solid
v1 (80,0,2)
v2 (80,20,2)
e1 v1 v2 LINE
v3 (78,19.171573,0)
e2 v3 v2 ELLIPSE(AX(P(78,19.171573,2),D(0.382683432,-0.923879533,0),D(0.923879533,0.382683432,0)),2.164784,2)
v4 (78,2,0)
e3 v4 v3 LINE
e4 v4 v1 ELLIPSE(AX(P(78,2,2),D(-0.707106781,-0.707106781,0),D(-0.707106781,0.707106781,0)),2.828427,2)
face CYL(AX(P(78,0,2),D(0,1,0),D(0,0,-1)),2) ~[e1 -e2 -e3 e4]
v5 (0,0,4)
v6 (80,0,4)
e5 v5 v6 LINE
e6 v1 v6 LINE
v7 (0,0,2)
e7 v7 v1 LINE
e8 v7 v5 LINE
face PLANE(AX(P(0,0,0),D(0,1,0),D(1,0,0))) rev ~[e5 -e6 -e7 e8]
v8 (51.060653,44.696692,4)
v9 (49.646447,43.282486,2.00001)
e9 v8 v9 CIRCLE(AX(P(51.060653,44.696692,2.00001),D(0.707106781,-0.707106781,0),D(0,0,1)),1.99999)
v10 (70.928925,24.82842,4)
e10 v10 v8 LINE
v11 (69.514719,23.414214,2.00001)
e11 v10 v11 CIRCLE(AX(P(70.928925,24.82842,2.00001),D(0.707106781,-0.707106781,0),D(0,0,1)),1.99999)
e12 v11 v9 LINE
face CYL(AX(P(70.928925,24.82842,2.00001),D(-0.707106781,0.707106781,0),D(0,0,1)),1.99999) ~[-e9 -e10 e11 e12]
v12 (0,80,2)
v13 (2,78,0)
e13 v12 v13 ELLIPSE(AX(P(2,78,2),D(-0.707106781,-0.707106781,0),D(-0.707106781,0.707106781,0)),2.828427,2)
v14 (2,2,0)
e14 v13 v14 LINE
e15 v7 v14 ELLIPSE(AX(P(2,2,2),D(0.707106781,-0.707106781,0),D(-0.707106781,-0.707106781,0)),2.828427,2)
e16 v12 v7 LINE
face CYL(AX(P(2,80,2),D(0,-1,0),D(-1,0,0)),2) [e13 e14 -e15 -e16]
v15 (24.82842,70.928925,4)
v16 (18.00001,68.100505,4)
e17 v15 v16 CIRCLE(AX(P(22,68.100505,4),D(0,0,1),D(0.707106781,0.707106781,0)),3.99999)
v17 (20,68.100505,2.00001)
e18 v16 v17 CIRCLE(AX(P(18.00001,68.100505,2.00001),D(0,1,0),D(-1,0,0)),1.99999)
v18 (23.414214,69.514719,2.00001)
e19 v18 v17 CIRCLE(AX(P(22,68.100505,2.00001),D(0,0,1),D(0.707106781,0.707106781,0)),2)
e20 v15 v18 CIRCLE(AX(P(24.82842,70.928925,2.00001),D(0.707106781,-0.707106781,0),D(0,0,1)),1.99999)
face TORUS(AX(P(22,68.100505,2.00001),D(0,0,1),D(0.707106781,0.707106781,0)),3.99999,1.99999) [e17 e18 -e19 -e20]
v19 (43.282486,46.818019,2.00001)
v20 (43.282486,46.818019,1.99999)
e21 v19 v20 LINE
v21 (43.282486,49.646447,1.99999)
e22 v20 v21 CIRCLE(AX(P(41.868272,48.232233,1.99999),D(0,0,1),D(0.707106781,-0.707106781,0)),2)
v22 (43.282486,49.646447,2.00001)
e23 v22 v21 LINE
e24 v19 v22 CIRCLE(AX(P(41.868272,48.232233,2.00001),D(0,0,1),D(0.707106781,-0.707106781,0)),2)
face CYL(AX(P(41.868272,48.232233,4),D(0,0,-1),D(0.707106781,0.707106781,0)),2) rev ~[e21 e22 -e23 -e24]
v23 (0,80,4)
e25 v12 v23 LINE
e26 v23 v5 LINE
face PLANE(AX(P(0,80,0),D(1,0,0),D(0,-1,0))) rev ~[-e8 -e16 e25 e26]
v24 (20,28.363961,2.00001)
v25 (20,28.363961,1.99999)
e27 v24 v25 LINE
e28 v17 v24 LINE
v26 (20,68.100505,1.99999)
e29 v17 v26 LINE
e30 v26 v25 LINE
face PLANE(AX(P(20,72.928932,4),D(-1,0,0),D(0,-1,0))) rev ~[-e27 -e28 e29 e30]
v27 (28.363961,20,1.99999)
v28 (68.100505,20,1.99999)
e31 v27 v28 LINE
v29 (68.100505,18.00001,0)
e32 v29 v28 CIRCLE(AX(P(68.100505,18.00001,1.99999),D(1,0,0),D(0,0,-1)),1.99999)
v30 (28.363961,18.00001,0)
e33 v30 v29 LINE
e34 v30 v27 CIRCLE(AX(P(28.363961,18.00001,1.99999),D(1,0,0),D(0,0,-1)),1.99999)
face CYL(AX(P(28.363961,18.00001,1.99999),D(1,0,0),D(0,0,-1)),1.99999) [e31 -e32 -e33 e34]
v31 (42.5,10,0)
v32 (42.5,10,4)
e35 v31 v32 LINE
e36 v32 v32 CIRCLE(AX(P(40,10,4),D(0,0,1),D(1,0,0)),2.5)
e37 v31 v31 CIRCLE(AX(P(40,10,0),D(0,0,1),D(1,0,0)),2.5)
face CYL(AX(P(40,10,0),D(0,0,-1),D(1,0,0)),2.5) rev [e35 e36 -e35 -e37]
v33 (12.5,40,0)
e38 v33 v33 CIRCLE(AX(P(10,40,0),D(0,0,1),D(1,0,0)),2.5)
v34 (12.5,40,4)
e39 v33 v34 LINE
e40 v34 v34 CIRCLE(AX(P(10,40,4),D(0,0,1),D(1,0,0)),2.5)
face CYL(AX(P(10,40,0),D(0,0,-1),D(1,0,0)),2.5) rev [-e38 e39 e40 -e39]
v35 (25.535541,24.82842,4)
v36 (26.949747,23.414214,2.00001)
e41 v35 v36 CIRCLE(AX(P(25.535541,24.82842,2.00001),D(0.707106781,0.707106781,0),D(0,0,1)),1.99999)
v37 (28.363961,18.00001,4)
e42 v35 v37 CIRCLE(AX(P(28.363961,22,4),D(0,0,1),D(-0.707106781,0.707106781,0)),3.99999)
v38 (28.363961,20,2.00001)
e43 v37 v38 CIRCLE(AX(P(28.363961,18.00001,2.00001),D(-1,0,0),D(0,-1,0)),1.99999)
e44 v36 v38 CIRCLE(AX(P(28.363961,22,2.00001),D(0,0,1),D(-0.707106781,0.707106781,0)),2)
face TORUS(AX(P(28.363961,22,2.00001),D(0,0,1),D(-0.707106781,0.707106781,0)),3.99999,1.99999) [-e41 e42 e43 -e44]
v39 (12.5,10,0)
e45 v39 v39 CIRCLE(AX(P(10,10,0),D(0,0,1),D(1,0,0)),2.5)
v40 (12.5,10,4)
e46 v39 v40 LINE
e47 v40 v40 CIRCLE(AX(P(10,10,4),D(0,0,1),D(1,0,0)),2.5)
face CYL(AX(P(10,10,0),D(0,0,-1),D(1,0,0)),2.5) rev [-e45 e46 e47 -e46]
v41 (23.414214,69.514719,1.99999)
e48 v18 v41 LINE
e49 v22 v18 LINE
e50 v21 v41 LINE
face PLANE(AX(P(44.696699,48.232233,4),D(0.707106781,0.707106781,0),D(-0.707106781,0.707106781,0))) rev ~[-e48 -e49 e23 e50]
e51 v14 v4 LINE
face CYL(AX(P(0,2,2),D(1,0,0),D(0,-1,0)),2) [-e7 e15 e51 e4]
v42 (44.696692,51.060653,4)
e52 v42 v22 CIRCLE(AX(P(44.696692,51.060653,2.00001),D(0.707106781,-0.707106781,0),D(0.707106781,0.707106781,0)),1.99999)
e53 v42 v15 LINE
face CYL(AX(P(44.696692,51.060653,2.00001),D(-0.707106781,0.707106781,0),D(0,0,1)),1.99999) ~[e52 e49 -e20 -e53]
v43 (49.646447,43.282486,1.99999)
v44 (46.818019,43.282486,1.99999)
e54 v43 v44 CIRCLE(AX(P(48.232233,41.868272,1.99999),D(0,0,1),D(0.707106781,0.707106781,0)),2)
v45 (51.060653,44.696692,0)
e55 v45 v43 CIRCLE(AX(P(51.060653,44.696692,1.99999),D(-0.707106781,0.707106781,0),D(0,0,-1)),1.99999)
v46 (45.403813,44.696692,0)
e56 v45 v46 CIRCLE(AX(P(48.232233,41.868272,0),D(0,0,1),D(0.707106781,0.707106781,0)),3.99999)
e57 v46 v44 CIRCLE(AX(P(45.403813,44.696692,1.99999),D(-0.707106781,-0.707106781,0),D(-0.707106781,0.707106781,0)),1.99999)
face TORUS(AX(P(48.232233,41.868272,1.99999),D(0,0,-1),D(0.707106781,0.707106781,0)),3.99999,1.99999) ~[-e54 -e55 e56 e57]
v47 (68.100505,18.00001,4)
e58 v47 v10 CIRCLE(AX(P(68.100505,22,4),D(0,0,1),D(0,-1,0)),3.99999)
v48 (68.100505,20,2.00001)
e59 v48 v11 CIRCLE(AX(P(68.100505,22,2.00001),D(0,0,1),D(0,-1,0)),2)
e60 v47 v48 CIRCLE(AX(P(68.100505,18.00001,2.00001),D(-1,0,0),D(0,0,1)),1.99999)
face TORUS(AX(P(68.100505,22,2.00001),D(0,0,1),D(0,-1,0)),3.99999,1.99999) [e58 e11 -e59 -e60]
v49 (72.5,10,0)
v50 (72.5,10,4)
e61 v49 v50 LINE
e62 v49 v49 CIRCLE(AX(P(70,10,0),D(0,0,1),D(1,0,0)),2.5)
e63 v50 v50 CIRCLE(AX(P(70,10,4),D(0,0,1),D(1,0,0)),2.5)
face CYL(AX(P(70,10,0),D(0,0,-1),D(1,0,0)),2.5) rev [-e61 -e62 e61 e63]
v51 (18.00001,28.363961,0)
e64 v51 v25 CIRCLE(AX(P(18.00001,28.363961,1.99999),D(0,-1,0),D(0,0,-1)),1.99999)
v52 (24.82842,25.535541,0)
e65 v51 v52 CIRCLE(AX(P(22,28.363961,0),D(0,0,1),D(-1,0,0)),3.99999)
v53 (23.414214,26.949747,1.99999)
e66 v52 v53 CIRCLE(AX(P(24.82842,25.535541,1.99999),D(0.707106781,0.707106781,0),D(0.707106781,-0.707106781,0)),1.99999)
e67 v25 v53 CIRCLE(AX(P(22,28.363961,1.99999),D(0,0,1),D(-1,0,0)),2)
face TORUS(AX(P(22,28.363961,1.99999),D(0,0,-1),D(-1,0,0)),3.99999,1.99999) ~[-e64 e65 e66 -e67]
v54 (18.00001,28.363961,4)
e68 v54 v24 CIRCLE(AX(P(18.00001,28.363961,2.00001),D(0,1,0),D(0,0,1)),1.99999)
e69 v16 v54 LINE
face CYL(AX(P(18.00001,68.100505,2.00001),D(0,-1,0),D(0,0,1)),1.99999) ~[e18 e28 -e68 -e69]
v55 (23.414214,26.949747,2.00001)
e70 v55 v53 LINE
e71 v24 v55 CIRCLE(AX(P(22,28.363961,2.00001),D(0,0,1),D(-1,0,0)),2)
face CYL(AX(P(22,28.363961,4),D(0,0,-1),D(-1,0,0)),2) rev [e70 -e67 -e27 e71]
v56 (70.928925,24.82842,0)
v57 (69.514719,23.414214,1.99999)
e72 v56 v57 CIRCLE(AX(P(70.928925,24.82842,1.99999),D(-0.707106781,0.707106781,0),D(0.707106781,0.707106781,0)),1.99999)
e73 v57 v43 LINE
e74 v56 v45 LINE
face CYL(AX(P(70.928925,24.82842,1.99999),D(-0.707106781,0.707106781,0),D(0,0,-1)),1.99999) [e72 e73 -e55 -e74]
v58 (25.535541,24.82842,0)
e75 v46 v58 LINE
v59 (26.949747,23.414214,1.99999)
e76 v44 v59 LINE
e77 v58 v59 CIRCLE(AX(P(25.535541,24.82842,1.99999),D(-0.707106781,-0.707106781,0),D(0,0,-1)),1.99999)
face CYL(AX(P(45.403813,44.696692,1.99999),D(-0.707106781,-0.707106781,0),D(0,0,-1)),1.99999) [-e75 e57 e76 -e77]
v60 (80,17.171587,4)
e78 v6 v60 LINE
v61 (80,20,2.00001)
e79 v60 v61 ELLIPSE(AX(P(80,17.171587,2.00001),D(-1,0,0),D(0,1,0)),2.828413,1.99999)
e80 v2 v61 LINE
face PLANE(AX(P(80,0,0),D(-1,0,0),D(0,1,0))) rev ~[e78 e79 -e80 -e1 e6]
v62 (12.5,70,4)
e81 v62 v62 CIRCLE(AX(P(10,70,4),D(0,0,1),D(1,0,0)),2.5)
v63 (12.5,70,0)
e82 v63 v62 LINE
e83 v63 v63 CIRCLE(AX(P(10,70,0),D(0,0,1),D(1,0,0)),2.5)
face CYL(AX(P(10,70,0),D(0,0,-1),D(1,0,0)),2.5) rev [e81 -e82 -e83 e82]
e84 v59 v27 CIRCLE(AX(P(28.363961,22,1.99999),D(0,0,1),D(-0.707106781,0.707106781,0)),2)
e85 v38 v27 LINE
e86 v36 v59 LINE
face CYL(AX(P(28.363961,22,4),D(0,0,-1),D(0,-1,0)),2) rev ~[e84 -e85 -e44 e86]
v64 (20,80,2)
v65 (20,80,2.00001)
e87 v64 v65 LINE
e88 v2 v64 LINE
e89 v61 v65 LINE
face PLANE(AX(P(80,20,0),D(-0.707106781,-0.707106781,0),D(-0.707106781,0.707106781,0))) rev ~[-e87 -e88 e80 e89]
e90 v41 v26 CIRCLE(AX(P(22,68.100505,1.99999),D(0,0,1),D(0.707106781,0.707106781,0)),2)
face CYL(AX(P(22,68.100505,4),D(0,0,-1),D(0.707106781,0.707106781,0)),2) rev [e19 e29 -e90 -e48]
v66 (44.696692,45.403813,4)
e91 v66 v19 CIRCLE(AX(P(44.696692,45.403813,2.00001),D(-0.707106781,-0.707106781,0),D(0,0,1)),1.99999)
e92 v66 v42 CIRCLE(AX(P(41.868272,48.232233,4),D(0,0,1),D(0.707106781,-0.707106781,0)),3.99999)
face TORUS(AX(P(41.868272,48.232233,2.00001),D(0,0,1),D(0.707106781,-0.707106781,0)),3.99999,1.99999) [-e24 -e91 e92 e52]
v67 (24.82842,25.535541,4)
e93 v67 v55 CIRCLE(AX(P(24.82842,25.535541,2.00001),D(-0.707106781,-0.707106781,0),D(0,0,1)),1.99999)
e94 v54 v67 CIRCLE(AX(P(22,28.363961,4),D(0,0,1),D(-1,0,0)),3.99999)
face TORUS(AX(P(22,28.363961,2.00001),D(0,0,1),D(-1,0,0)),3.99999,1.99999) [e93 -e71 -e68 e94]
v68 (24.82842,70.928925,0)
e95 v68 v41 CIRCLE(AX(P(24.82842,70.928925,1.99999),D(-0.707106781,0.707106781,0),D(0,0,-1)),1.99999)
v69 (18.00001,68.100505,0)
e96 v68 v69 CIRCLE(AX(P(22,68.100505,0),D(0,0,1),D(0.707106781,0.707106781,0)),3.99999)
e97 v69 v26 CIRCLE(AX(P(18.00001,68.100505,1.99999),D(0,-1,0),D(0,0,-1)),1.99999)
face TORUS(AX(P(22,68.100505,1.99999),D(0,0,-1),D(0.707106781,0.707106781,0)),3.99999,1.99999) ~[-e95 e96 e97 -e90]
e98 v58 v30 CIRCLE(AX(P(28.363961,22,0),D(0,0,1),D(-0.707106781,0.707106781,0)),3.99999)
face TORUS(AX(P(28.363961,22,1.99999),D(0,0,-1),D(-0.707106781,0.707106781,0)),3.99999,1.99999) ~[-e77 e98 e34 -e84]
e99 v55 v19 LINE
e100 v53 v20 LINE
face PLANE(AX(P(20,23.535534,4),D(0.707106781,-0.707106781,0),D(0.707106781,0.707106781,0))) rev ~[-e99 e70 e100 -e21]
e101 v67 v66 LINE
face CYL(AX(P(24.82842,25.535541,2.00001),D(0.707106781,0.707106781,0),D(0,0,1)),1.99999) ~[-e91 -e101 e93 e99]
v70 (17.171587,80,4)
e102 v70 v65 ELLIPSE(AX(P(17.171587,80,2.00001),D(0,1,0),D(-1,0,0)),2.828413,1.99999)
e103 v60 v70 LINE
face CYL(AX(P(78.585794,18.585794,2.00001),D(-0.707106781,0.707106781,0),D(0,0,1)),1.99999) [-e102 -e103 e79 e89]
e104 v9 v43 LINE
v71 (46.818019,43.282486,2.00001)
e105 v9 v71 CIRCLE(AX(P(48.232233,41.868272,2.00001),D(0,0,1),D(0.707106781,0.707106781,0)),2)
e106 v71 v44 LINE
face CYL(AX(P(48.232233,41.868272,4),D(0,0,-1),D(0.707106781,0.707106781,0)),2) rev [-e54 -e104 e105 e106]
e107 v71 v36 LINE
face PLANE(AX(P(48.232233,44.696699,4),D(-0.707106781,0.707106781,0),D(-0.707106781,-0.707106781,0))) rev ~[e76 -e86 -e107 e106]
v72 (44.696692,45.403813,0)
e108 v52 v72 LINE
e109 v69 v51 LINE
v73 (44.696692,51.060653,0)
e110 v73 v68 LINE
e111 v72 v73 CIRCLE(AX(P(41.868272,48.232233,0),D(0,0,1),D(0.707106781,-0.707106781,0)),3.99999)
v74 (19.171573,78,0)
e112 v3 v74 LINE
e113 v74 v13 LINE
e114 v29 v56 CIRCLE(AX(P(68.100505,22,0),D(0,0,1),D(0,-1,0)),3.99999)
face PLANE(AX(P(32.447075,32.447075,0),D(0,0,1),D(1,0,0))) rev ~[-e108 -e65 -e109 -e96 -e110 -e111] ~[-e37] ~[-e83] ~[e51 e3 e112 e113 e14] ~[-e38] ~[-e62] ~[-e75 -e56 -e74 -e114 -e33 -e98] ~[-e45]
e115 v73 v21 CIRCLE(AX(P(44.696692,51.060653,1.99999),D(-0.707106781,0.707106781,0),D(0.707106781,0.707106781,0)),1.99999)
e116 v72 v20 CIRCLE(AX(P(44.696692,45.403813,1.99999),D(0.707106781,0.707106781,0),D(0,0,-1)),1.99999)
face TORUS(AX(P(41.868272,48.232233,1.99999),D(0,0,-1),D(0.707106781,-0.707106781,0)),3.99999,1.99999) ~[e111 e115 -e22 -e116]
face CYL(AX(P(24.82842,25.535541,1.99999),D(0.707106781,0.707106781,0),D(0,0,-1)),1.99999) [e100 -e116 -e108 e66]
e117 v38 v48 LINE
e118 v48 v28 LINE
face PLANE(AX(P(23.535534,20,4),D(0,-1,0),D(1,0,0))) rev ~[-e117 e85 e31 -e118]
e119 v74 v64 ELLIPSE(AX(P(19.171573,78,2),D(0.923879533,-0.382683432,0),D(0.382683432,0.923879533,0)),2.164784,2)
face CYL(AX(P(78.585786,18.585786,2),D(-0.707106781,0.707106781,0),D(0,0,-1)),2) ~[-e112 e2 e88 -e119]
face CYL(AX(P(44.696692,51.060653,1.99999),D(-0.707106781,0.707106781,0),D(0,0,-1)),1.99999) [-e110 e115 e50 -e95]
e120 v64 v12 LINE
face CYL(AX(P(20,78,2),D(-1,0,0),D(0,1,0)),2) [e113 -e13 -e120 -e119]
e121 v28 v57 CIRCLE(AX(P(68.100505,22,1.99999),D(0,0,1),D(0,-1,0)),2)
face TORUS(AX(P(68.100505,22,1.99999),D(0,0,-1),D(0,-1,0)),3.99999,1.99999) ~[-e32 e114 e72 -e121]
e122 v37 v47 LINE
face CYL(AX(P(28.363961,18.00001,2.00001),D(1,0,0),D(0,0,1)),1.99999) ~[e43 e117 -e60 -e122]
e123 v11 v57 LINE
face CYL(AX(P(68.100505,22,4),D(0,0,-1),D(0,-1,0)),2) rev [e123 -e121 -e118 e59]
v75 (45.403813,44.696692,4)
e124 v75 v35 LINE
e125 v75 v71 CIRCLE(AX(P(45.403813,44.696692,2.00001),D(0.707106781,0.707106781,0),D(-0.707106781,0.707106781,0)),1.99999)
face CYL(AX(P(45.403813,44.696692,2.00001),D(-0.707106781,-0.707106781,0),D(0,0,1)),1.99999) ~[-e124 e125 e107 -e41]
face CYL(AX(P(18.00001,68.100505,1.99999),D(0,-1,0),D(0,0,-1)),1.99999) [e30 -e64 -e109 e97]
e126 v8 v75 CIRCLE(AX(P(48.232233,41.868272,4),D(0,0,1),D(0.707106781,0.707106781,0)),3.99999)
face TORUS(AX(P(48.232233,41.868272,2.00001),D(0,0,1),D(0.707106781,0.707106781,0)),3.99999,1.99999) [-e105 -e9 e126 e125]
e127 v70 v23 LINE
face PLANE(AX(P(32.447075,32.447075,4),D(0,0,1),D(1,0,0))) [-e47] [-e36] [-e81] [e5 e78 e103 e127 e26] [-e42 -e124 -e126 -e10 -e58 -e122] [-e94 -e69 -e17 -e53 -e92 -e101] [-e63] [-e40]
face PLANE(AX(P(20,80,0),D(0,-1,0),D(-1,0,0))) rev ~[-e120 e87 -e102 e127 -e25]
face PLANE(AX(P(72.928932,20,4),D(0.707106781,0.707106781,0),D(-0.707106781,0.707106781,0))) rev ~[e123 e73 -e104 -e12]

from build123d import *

# Parameters (mm, degrees)
F0_R     = 2.5
F1_DEPTH = 4
F3_DEPTH = 25
F4_R     = 2
F5_R     = 1.99999


# Not quite as in the source:
# - a fillet or chamfer is up to 0.001 mm smaller than in the source, because OpenCascade refuses the exact size


with BuildPart() as f1:
    # F0 (on Top) → F1 (new body)
    with BuildSketch(Plane.XY):
        Polygon((0, 80), (0, 0), (80, 0), (80, 20), (20, 80), align=None)
        with Locations((10, 10)):
            Circle(F0_R, mode=Mode.SUBTRACT)
        with Locations((40, 10)):
            Circle(F0_R, mode=Mode.SUBTRACT)
        with Locations((70, 10)):
            Circle(F0_R, mode=Mode.SUBTRACT)
        with Locations((10, 40)):
            Circle(F0_R, mode=Mode.SUBTRACT)
        with Locations((10, 70)):
            Circle(F0_R, mode=Mode.SUBTRACT)
    extrude(amount=F1_DEPTH)

    # F2 (on face) → F3 (cut)
    with BuildSketch(Plane.XY.offset(4)):
        Polygon((44.6966991411, 48.232233047), (20, 72.9289321881), (20, 23.5355339059), align=None)
        Polygon((23.5355339059, 20), (72.9289321881, 20), (48.232233047, 44.6966991411), align=None)
    extrude(amount=-F3_DEPTH, mode=Mode.SUBTRACT)

    # F4
    f4_edges = [f1.edges().sort_by_distance(p)[0] for p in [
        (80, 10, 0),
        (50, 50, 0),
        (10, 80, 0),
        (0, 40, 0),
        (40, 0, 0),
        (72.928932, 20, 2),
        (48.232233, 44.696699, 2),
        (23.535534, 20, 2),
        (44.696699, 48.232233, 2),
        (20, 23.535534, 2),
        (20, 72.928932, 2),
    ]]
    fillet(f4_edges, radius=F4_R)

    # F5 (radius 2 in the source; OpenCascade refuses exactly that, so slightly less here)
    f5_edges = [f1.edges().sort_by_distance(p)[0] for p in [
        (48.232233, 20, 0),
        (20, 48.232233, 0),
        (50, 50, 4),
        (33.34835, 36.883883, 4),
        (59.580583, 33.34835, 4),
    ]]
    fillet(f5_edges, radius=F5_R)


solid = f1.part
